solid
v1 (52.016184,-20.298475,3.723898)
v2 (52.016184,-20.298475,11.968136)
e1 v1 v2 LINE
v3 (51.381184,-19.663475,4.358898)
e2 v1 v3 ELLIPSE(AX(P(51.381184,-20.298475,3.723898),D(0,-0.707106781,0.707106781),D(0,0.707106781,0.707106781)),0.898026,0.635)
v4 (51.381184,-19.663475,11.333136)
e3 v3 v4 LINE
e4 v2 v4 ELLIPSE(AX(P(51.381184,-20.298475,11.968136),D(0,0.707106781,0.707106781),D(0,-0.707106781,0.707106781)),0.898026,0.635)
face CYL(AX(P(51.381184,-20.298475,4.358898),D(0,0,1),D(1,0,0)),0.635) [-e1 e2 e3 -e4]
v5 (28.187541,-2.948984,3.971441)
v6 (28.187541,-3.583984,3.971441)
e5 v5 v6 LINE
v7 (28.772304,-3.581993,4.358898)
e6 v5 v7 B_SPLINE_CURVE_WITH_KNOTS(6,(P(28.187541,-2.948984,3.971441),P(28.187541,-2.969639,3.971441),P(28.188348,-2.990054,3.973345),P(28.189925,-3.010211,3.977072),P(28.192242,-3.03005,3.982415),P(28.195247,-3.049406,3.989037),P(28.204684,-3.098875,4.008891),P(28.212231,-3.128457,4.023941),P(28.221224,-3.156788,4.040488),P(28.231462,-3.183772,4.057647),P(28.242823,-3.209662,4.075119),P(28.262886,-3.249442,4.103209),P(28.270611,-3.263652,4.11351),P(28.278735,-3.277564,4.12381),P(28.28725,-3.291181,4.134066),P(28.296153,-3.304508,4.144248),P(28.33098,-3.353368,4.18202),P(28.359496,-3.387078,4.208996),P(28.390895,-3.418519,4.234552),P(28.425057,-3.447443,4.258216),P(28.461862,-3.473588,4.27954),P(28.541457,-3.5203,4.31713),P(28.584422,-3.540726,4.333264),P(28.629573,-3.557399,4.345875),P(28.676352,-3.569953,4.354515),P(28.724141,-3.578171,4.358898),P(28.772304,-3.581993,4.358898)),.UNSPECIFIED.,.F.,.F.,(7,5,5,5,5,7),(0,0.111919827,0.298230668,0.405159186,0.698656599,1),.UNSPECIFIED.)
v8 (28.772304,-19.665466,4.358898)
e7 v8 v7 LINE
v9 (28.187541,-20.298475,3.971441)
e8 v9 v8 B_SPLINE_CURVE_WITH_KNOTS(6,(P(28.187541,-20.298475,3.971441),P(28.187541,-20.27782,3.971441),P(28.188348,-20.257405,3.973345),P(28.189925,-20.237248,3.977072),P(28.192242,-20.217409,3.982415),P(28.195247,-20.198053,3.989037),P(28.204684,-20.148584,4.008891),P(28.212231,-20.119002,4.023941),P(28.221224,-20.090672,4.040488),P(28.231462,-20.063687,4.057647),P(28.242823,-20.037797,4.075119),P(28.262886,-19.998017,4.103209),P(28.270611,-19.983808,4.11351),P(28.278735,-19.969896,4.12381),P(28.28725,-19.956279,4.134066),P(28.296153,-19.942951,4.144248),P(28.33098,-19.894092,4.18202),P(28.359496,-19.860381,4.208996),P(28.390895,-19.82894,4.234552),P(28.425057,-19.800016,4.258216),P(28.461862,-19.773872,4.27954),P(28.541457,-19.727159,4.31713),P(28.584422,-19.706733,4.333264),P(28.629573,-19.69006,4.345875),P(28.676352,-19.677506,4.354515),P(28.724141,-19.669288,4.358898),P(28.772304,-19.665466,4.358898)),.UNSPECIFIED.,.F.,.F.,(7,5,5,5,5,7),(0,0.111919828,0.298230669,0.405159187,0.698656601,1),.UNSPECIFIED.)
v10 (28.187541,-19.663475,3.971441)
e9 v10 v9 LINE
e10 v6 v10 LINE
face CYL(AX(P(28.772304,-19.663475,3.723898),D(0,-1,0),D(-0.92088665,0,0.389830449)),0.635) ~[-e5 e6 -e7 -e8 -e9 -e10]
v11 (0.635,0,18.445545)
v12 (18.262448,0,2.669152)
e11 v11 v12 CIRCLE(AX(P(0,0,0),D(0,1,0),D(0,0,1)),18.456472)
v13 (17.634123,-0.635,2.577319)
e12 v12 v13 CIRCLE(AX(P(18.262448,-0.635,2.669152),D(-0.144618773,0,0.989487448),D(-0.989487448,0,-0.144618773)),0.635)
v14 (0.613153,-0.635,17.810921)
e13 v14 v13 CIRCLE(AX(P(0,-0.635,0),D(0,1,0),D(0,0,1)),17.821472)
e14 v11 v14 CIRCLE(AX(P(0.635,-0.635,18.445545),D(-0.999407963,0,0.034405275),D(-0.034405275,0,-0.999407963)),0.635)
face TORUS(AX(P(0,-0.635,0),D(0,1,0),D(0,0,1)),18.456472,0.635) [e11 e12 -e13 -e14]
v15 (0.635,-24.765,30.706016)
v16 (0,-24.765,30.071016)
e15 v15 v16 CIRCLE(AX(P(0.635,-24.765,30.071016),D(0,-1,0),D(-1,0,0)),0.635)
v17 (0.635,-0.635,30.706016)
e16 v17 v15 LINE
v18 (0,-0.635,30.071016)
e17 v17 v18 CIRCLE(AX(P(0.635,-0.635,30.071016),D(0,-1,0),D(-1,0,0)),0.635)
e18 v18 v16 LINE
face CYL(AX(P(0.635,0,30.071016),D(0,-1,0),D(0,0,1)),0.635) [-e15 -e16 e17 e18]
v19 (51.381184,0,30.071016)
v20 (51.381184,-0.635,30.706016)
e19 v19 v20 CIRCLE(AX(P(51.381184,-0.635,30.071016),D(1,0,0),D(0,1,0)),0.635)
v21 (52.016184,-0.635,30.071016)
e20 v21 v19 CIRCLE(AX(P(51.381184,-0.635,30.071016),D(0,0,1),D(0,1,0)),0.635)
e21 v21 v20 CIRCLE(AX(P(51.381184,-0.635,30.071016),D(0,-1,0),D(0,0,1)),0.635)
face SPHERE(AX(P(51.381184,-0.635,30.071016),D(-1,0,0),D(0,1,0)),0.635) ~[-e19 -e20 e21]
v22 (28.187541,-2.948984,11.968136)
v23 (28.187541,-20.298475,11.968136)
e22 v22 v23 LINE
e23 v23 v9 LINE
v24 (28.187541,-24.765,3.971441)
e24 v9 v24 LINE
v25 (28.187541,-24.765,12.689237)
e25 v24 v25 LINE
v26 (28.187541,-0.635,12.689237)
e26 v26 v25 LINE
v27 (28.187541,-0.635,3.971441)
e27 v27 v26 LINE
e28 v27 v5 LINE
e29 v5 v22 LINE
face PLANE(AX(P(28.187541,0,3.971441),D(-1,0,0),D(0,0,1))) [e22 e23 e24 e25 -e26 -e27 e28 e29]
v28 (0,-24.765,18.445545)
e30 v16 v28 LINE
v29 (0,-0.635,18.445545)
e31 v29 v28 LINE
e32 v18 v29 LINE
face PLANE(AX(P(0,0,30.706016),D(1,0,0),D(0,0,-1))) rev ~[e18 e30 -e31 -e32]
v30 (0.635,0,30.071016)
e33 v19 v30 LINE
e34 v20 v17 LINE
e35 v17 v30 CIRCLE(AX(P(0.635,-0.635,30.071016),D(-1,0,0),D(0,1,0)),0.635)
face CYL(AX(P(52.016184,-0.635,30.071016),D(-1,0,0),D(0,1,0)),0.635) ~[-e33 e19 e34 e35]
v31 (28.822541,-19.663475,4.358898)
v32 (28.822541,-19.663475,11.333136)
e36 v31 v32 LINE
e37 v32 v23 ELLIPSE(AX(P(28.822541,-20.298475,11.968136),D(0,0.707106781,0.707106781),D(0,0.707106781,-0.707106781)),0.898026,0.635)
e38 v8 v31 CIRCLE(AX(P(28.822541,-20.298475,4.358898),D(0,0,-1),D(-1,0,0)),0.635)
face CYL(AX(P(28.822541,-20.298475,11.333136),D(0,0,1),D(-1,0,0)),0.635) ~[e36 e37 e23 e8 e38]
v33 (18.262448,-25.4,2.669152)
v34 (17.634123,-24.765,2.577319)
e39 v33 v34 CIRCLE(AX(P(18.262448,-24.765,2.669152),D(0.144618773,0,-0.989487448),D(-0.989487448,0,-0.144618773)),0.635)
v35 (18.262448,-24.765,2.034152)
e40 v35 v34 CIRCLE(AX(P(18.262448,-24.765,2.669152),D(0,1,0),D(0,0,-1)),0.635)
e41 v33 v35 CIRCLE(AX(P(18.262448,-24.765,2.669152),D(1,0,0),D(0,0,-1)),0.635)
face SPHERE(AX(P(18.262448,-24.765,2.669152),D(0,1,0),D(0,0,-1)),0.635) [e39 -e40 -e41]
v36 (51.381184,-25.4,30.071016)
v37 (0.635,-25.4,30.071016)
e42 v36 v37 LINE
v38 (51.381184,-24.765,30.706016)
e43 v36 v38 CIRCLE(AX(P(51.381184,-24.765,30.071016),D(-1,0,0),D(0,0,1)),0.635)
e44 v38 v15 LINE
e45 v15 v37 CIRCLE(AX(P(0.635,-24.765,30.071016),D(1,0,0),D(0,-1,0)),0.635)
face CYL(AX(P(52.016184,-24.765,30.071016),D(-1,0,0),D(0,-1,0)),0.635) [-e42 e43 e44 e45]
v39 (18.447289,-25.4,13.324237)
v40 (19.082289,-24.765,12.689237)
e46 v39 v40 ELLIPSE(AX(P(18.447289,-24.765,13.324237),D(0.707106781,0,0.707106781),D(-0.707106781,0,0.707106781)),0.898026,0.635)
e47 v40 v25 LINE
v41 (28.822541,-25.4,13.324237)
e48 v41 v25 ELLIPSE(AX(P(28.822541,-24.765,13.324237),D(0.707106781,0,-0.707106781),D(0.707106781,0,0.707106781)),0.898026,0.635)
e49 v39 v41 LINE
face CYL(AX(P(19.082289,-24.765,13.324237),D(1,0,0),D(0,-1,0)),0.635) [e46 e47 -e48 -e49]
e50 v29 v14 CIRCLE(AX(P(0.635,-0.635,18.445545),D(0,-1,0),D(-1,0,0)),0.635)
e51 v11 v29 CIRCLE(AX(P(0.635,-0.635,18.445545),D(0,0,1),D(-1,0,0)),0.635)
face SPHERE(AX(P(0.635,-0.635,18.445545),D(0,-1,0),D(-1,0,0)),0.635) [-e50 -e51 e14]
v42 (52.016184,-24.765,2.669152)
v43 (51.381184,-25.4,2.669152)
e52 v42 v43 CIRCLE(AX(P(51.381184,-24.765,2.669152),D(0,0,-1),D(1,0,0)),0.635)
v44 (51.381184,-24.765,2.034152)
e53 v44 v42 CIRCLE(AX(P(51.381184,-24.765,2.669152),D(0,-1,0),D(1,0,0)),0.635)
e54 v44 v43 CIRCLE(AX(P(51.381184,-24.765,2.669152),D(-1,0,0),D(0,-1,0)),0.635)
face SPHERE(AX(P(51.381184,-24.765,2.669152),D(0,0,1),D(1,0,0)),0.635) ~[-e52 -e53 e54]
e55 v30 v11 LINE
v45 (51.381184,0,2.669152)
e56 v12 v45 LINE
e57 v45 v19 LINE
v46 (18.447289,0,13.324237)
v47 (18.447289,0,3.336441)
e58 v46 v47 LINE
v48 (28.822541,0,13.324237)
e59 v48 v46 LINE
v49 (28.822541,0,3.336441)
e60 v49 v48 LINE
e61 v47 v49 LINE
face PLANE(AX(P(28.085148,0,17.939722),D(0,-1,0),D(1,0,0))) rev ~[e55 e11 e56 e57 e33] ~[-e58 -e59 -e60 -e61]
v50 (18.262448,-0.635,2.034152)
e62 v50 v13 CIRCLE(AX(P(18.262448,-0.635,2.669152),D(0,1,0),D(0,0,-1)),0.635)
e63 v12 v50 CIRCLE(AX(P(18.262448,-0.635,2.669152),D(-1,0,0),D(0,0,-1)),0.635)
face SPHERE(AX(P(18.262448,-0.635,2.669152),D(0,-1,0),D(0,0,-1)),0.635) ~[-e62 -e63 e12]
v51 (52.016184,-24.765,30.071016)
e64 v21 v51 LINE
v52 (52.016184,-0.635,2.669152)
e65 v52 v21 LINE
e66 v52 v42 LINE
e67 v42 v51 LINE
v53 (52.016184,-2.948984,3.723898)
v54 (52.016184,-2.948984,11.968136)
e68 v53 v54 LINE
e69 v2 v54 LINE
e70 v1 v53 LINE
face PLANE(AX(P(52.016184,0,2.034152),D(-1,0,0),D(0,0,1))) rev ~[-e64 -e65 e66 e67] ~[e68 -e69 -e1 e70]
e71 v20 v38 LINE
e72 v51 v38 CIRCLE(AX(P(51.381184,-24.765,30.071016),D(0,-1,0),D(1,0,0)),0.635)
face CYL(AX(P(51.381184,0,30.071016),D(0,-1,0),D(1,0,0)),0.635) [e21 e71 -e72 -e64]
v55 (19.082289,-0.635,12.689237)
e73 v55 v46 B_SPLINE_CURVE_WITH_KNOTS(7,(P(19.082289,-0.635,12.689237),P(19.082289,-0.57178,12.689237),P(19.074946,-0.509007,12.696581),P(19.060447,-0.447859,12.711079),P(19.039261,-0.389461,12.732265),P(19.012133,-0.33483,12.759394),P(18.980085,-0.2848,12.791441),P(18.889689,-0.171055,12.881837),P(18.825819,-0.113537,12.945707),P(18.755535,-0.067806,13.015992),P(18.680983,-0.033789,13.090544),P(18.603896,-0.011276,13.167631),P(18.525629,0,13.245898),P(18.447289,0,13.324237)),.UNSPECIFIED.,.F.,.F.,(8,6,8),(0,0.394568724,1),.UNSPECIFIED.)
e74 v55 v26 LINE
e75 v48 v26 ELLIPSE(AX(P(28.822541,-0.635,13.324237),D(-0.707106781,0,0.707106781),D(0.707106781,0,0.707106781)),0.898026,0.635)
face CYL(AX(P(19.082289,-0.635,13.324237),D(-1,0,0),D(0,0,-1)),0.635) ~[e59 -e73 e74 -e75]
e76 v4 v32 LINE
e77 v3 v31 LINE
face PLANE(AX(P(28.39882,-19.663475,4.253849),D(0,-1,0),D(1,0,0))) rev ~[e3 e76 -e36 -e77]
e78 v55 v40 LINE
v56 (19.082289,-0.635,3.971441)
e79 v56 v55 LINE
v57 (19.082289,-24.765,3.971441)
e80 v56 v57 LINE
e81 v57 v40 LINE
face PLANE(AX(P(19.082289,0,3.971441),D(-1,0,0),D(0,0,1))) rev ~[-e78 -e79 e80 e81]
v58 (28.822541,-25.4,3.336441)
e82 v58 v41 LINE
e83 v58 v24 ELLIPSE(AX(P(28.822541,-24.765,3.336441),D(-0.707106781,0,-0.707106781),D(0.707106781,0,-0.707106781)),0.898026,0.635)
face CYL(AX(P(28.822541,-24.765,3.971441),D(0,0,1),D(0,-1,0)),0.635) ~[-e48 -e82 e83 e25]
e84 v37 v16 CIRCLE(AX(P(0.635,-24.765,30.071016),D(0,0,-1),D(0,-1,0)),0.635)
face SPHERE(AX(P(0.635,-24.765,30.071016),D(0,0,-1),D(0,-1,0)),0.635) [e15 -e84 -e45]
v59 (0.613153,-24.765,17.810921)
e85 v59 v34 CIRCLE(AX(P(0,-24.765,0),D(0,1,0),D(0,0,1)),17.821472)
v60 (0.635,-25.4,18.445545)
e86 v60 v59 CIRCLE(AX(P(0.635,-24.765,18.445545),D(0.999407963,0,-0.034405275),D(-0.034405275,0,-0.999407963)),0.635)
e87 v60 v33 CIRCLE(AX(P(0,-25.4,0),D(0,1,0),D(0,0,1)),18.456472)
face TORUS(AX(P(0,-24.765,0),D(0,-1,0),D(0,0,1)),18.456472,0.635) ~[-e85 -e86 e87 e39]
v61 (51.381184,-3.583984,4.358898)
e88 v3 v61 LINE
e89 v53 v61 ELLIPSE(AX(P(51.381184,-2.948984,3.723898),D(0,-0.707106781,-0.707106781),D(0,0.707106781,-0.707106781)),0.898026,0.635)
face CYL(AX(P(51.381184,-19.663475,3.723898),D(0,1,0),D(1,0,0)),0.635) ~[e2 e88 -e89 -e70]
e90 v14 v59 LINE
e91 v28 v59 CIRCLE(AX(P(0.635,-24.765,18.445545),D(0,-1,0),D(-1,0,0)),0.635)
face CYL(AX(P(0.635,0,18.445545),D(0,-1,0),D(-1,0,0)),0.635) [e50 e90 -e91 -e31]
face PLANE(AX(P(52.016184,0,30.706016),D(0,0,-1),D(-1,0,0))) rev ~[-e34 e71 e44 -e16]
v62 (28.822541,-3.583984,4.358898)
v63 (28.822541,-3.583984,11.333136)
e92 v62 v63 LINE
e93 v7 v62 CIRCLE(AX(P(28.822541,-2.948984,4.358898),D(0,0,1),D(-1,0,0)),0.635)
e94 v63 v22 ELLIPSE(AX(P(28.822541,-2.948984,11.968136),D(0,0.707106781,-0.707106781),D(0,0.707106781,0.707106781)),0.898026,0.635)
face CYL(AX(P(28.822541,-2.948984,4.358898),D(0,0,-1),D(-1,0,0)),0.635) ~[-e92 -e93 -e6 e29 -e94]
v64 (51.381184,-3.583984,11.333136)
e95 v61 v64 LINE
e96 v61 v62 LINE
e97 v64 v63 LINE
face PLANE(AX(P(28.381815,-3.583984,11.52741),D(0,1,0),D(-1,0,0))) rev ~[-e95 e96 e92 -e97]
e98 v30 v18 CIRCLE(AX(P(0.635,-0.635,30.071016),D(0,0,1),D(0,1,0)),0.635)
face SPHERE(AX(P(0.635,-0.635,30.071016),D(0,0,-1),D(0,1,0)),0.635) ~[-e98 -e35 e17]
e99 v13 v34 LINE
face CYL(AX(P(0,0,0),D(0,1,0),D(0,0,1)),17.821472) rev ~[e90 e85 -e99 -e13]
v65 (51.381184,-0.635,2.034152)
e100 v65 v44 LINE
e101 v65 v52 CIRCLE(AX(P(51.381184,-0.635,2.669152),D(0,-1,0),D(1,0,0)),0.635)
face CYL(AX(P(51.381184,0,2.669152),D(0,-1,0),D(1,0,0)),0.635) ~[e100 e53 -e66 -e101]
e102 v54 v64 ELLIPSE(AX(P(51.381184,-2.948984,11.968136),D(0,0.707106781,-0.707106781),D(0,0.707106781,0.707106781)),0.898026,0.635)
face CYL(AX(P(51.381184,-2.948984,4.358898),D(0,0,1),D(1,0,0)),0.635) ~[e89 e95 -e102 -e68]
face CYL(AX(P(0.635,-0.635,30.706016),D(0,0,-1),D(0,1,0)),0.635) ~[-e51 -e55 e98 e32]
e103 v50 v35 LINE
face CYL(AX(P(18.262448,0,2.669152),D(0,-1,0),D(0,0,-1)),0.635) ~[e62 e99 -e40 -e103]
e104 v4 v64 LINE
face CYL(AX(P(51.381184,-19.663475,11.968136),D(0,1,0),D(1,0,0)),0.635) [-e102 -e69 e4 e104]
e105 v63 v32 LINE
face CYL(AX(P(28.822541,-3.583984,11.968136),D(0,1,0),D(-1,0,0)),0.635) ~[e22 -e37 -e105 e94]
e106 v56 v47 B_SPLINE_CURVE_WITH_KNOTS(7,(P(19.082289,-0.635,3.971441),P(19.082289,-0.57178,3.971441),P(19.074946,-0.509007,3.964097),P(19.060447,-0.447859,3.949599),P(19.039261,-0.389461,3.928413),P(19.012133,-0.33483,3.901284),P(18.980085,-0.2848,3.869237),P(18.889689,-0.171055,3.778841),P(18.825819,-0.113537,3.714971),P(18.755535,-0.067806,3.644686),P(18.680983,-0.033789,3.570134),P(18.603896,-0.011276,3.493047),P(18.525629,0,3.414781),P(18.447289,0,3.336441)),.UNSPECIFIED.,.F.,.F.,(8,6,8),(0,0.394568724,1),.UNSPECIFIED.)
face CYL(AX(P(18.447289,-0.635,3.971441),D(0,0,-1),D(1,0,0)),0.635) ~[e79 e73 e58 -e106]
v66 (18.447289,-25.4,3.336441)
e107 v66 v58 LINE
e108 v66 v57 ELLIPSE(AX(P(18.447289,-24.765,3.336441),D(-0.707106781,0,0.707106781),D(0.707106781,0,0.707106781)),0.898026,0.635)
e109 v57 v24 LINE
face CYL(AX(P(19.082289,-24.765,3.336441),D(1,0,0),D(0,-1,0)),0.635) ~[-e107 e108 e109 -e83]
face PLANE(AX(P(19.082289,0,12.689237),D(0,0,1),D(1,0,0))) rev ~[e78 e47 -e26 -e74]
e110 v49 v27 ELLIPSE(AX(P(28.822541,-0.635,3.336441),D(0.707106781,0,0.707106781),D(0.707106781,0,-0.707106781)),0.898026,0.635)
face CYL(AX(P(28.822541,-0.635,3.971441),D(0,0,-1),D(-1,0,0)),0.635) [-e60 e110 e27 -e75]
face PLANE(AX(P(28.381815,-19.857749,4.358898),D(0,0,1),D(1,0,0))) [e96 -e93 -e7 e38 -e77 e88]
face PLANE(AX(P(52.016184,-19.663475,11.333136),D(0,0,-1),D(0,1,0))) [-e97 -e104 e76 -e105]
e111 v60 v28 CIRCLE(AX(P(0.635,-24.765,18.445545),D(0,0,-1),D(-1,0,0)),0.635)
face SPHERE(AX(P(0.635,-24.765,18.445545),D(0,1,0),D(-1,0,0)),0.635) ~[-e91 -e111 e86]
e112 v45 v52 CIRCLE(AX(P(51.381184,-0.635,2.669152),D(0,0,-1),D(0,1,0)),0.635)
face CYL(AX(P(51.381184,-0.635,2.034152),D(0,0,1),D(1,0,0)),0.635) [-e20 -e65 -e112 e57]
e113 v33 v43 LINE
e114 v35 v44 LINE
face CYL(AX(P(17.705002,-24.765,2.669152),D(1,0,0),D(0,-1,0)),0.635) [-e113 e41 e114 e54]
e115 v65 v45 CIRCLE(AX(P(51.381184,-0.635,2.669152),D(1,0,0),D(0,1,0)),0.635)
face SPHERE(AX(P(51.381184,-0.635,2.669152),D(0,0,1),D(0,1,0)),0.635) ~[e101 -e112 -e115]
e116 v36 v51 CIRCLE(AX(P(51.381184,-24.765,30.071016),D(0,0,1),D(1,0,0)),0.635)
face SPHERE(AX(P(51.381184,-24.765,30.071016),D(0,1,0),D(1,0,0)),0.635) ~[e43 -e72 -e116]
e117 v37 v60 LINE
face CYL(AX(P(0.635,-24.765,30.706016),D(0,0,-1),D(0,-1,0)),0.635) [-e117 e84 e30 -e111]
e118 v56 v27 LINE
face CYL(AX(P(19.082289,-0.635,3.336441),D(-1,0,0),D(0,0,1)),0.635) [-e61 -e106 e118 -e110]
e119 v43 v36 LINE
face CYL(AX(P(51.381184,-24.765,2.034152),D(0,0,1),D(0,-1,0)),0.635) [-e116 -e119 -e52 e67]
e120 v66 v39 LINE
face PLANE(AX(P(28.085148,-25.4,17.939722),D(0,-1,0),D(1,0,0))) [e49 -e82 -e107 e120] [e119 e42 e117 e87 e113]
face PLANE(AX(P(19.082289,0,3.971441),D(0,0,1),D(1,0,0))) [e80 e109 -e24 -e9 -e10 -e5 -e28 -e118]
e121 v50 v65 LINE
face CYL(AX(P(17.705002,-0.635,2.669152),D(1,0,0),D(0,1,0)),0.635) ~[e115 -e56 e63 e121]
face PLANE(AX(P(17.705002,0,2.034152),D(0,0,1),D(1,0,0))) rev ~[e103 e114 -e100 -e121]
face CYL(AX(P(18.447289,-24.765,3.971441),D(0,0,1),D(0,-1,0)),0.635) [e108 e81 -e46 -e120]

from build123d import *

# Parameters (mm, degrees)
F0_W         = 9.105252102
F0_H         = 8.7177967653
F1_DEPTH     = 25.4
F2_W         = 16.0794917028
F2_H         = 6.9742375053
F3_DEPTH     = 23.8286424428
F4_R         = 0.635
F5_T1_DEPTH  = 16.0794917028
F5_T3_DEPTH  = 6.9742375053
F5_T5_DEPTH  = 8.7177967653
F5_T7_DEPTH  = 9.105252102
F5_T13_DEPTH = 17.6669917028
F5_T17_DEPTH = 8.5617375053
F5_T25_DEPTH = 17.6669917028
F5_T29_DEPTH = 8.5617375053
F5_T37_DEPTH = 8.5617375053
F5_T42_DEPTH = 17.5413992589
F5_T49_DEPTH = 17.5413992589
F5_T53_DEPTH = 8.5617375053
F5_T61_DEPTH = 10.3052967653
F5_T65_DEPTH = 10.692752102
F5_T72_DEPTH = 10.692752102
F5_T76_DEPTH = 10.3052967653
F5_T83_DEPTH = 10.692752102
F5_T87_DEPTH = 10.3052967653
F5_T94_DEPTH = 10.3052967653
F5_T98_DEPTH = 10.692752102
F6_R         = 0.635


# Not quite as in the source:
# - a fillet or chamfer that OpenCascade refuses, or shapes differently, is made with other operations: its cross-section is extruded or revolved along the edge and cut away or added


with BuildPart() as f1:
    # F0 (on Front) → F1 (new body)
    with BuildSketch(Plane.XZ):
        with BuildLine():
            ThreePointArc((0, 17.8214723471), (11.860718486, 13.3014372763), (17.7050021368, 2.0341523923))
            Line((17.7050021368, 2.0341523923), (52.0161837339, 2.0341523923))
            Line((52.0161837339, 2.0341523923), (52.0161837339, 30.7060163468))
            Line((52.0161837339, 30.7060163468), (0, 30.7060163468))
            Line((0, 30.7060163468), (0, 17.8214723471))
        make_face()
        with Locations((23.6349152401, 8.3303391002)):
            Rectangle(F0_W, F0_H, mode=Mode.SUBTRACT)
    extrude(amount=F1_DEPTH)

    # F2 (on face) → F3 (cut, through all)
    with BuildSketch(Plane.YZ.offset(52.0161837339)):
        with Locations((-11.6237296024, 7.8460171353)):
            Rectangle(F2_W, F2_H)
    extrude(amount=-F3_DEPTH, mode=Mode.SUBTRACT)

    # F4
    f4_edges = [f1.edges().sort_by_distance(p)[0] for p in [
        (23.634915, -25.4, 3.971441),
        (19.082289, -25.4, 8.330339),
        (23.634915, -25.4, 12.689237),
        (28.187541, -25.4, 8.330339),
        (52.016184, -11.62373, 4.358898),
        (52.016184, -19.663475, 7.846017),
        (52.016184, -11.62373, 11.333136),
        (52.016184, -3.583984, 7.846017),
    ]]
    fillet(f4_edges, radius=F4_R)

    # F5: fillet of radius 0.635 on 8 edges, made by hand

    # F5_s2 → F5_t1 (cut)
    with BuildSketch(Plane.XZ.offset(3.583983751)):
        with BuildLine():
            ThreePointArc((28.1875412911, 11.968135888), (28.3735284851, 11.5191230819), (28.8225412911, 11.333135888))
            Line((28.8225412911, 11.333135888), (28.1875412911, 11.333135888))
            Line((28.1875412911, 11.333135888), (28.1875412911, 11.968135888))
        make_face()
        with BuildLine():
            ThreePointArc((28.1875412911, 3.9714407176), (28.421565367, 4.2532443861), (28.7723043136, 4.3588983826))
            Line((28.7723043136, 4.3588983826), (28.1875412911, 4.3588983826))
            Line((28.1875412911, 4.3588983826), (28.1875412911, 3.9714407176))
        make_face()
    extrude(amount=F5_T1_DEPTH, mode=Mode.SUBTRACT)

    # F5_s4 → F5_t3 (cut)
    with BuildSketch(Plane.XY.offset(4.3588983826)):
        with BuildLine():
            ThreePointArc((28.1875412911, -20.2984754539), (28.3735284851, -19.8494626478), (28.8225412911, -19.6634754539))
            Line((28.8225412911, -19.6634754539), (28.1875412911, -19.6634754539))
            Line((28.1875412911, -19.6634754539), (28.1875412911, -20.2984754539))
        make_face()
        with BuildLine():
            ThreePointArc((28.1875412911, -2.948983751), (28.3735284851, -3.3979965571), (28.8225412911, -3.583983751))
            Line((28.8225412911, -3.583983751), (28.1875412911, -3.583983751))
            Line((28.1875412911, -3.583983751), (28.1875412911, -2.948983751))
        make_face()
    extrude(amount=F5_T3_DEPTH, mode=Mode.SUBTRACT)

    # F5_s6 → F5_t5 (cut)
    with BuildSketch(Plane.XY.offset(3.9714407176)):
        with BuildLine():
            ThreePointArc((28.1875412911, -0.635), (28.3735284851, -0.1859871939), (28.8225412911, 0))
            Line((28.8225412911, 0), (28.1875412911, 0))
            Line((28.1875412911, 0), (28.1875412911, -0.635))
        make_face()
        with BuildLine():
            ThreePointArc((19.0822891891, -0.635), (18.8963019952, -0.1859871939), (18.4472891891, 0))
            Line((18.4472891891, 0), (19.0822891891, 0))
            Line((19.0822891891, 0), (19.0822891891, -0.635))
        make_face()
    extrude(amount=F5_T5_DEPTH, mode=Mode.SUBTRACT)

    # F5_s8 → F5_t7 (cut)
    with BuildSketch(Plane.YZ.offset(19.0822891891)):
        with BuildLine():
            ThreePointArc((-0.635, 12.6892374828), (-0.1859871939, 12.8752246768), (0, 13.3242374828))
            Line((0, 13.3242374828), (0, 12.6892374828))
            Line((0, 12.6892374828), (-0.635, 12.6892374828))
        make_face()
        with BuildLine():
            ThreePointArc((-0.635, 3.9714407176), (-0.1859871939, 3.7854535236), (0, 3.3364407176))
            Line((0, 3.3364407176), (0, 3.9714407176))
            Line((0, 3.9714407176), (-0.635, 3.9714407176))
        make_face()
    extrude(amount=F5_T7_DEPTH, mode=Mode.SUBTRACT)


with BuildPart() as f5_tool11:
    # F5_s12 → F5_t13 (new body)
    with BuildSketch(Plane.XZ.offset(1.996483751)):
        with BuildLine():
            ThreePointArc((28.1875412911, 11.968135888), (28.3735284851, 11.5191230819), (28.8225412911, 11.333135888))
            Line((28.8225412911, 11.333135888), (28.1875412911, 11.333135888))
            Line((28.1875412911, 11.333135888), (28.1875412911, 11.968135888))
        make_face()
    extrude(amount=F5_T13_DEPTH)

    split(bisect_by=Plane.XZ.offset(3.583983751), keep=Keep.BOTTOM)


with BuildPart() as f5_tool15:
    # F5_s16 → F5_t17 (new body)
    with BuildSketch(Plane.XY.offset(4.3588983826)):
        with BuildLine():
            ThreePointArc((28.1875412911, -2.948983751), (28.3735284851, -3.3979965571), (28.8225412911, -3.583983751))
            Line((28.8225412911, -3.583983751), (28.1875412911, -3.583983751))
            Line((28.1875412911, -3.583983751), (28.1875412911, -2.948983751))
        make_face()
    extrude(amount=F5_T17_DEPTH)

    split(bisect_by=Plane.XY.offset(12.6892374828), keep=Keep.BOTTOM)

    split(bisect_by=Plane.XY.offset(11.333135888), keep=Keep.TOP)


with BuildPart() as f5_tool11_1:
    add(f5_tool11.part)

    # F5_t20: intersect F5_tool15
    add(f5_tool15.part, mode=Mode.INTERSECT)


with BuildPart() as f1_1:
    add(f1.part)

    # F5_t9: cut F5_tool11
    add(f5_tool11_1.part, mode=Mode.SUBTRACT)


with BuildPart() as f5_tool23:
    # F5_s24 → F5_t25 (new body)
    with BuildSketch(Plane.XZ.offset(3.583983751)):
        with BuildLine():
            ThreePointArc((28.1875412911, 11.968135888), (28.3735284851, 11.5191230819), (28.8225412911, 11.333135888))
            Line((28.8225412911, 11.333135888), (28.1875412911, 11.333135888))
            Line((28.1875412911, 11.333135888), (28.1875412911, 11.968135888))
        make_face()
    extrude(amount=F5_T25_DEPTH)

    split(bisect_by=Plane.XZ.offset(19.6634754539), keep=Keep.TOP)


with BuildPart() as f5_tool27:
    # F5_s28 → F5_t29 (new body)
    with BuildSketch(Plane.XY.offset(12.920635888)):
        with BuildLine():
            ThreePointArc((28.1875412911, -20.2984754539), (28.3735284851, -19.8494626478), (28.8225412911, -19.6634754539))
            Line((28.8225412911, -19.6634754539), (28.1875412911, -19.6634754539))
            Line((28.1875412911, -19.6634754539), (28.1875412911, -20.2984754539))
        make_face()
    extrude(amount=-F5_T29_DEPTH)

    split(bisect_by=Plane.XY.offset(12.6892374828), keep=Keep.BOTTOM)

    split(bisect_by=Plane.XY.offset(11.333135888), keep=Keep.TOP)


with BuildPart() as f5_tool23_1:
    add(f5_tool23.part)

    # F5_t32: intersect F5_tool27
    add(f5_tool27.part, mode=Mode.INTERSECT)


with BuildPart() as f1_2:
    add(f1_1.part)

    # F5_t21: cut F5_tool23
    add(f5_tool23_1.part, mode=Mode.SUBTRACT)


with BuildPart() as f5_tool35:
    # F5_s36 → F5_t37 (new body)
    with BuildSketch(Plane.XY.offset(11.333135888)):
        with BuildLine():
            ThreePointArc((28.1875412911, -20.2984754539), (28.3735284851, -19.8494626478), (28.8225412911, -19.6634754539))
            Line((28.8225412911, -19.6634754539), (28.1875412911, -19.6634754539))
            Line((28.1875412911, -19.6634754539), (28.1875412911, -20.2984754539))
        make_face()
    extrude(amount=-F5_T37_DEPTH)

    split(bisect_by=Plane.XY.offset(3.9714407176), keep=Keep.TOP)

    split(bisect_by=Plane.XY.offset(4.3588983826), keep=Keep.BOTTOM)


with BuildPart() as f5_tool40:
    # F5_s41 → F5_t42 (new body)
    with BuildSketch(Plane.XZ.offset(21.1253830099)):
        with BuildLine():
            ThreePointArc((28.1875412911, 3.9714407176), (28.421565367, 4.2532443861), (28.7723043136, 4.3588983826))
            Line((28.7723043136, 4.3588983826), (28.1875412911, 4.3588983826))
            Line((28.1875412911, 4.3588983826), (28.1875412911, 3.9714407176))
        make_face()
    extrude(amount=-F5_T42_DEPTH)

    split(bisect_by=Plane.XZ.offset(19.6634754539), keep=Keep.TOP)


with BuildPart() as f5_tool35_1:
    add(f5_tool35.part)

    # F5_t44: intersect F5_tool40
    add(f5_tool40.part, mode=Mode.INTERSECT)


with BuildPart() as f1_3:
    add(f1_2.part)

    # F5_t33: cut F5_tool35
    add(f5_tool35_1.part, mode=Mode.SUBTRACT)


with BuildPart() as f5_tool47:
    # F5_s48 → F5_t49 (new body)
    with BuildSketch(Plane.XZ.offset(19.6634754539)):
        with BuildLine():
            ThreePointArc((28.1875412911, 3.9714407176), (28.421565367, 4.2532443861), (28.7723043136, 4.3588983826))
            Line((28.7723043136, 4.3588983826), (28.1875412911, 4.3588983826))
            Line((28.1875412911, 4.3588983826), (28.1875412911, 3.9714407176))
        make_face()
    extrude(amount=-F5_T49_DEPTH)

    split(bisect_by=Plane.XZ.offset(3.583983751), keep=Keep.BOTTOM)


with BuildPart() as f5_tool51:
    # F5_s52 → F5_t53 (new body)
    with BuildSketch(Plane.XY.offset(2.7713983826)):
        with BuildLine():
            ThreePointArc((28.1875412911, -2.948983751), (28.3735284851, -3.3979965571), (28.8225412911, -3.583983751))
            Line((28.8225412911, -3.583983751), (28.1875412911, -3.583983751))
            Line((28.1875412911, -3.583983751), (28.1875412911, -2.948983751))
        make_face()
    extrude(amount=F5_T53_DEPTH)

    split(bisect_by=Plane.XY.offset(3.9714407176), keep=Keep.TOP)

    split(bisect_by=Plane.XY.offset(4.3588983826), keep=Keep.BOTTOM)


with BuildPart() as f5_tool47_1:
    add(f5_tool47.part)

    # F5_t56: intersect F5_tool51
    add(f5_tool51.part, mode=Mode.INTERSECT)


with BuildPart() as f1_4:
    add(f1_3.part)

    # F5_t45: cut F5_tool47
    add(f5_tool47_1.part, mode=Mode.SUBTRACT)


with BuildPart() as f5_tool59:
    # F5_s60 → F5_t61 (new body)
    with BuildSketch(Plane.XY.offset(14.2767374828)):
        with BuildLine():
            ThreePointArc((28.1875412911, -0.635), (28.3735284851, -0.1859871939), (28.8225412911, 0))
            Line((28.8225412911, 0), (28.1875412911, 0))
            Line((28.1875412911, 0), (28.1875412911, -0.635))
        make_face()
    extrude(amount=-F5_T61_DEPTH)

    split(bisect_by=Plane.XY.offset(12.6892374828), keep=Keep.TOP)


with BuildPart() as f5_tool63:
    # F5_s64 → F5_t65 (new body)
    with BuildSketch(Plane.YZ.offset(19.0822891891)):
        with BuildLine():
            ThreePointArc((-0.635, 12.6892374828), (-0.1859871939, 12.8752246768), (0, 13.3242374828))
            Line((0, 13.3242374828), (0, 12.6892374828))
            Line((0, 12.6892374828), (-0.635, 12.6892374828))
        make_face()
    extrude(amount=F5_T65_DEPTH)

    split(bisect_by=Plane.YZ.offset(28.1875412911), keep=Keep.TOP)


with BuildPart() as f5_tool59_1:
    add(f5_tool59.part)

    # F5_t67: intersect F5_tool63
    add(f5_tool63.part, mode=Mode.INTERSECT)


with BuildPart() as f1_5:
    add(f1_4.part)

    # F5_t57: cut F5_tool59
    add(f5_tool59_1.part, mode=Mode.SUBTRACT)


with BuildPart() as f5_tool70:
    # F5_s71 → F5_t72 (new body)
    with BuildSketch(Plane.YZ.offset(29.7750412911)):
        with BuildLine():
            ThreePointArc((-0.635, 3.9714407176), (-0.1859871939, 3.7854535236), (0, 3.3364407176))
            Line((0, 3.3364407176), (0, 3.9714407176))
            Line((0, 3.9714407176), (-0.635, 3.9714407176))
        make_face()
    extrude(amount=-F5_T72_DEPTH)

    split(bisect_by=Plane.YZ.offset(28.1875412911), keep=Keep.TOP)


with BuildPart() as f5_tool74:
    # F5_s75 → F5_t76 (new body)
    with BuildSketch(Plane.XY.offset(12.6892374828)):
        with BuildLine():
            ThreePointArc((28.1875412911, -0.635), (28.3735284851, -0.1859871939), (28.8225412911, 0))
            Line((28.8225412911, 0), (28.1875412911, 0))
            Line((28.1875412911, 0), (28.1875412911, -0.635))
        make_face()
    extrude(amount=-F5_T76_DEPTH)

    split(bisect_by=Plane.XY.offset(3.9714407176), keep=Keep.BOTTOM)


with BuildPart() as f5_tool70_1:
    add(f5_tool70.part)

    # F5_t78: intersect F5_tool74
    add(f5_tool74.part, mode=Mode.INTERSECT)


with BuildPart() as f1_6:
    add(f1_5.part)

    # F5_t68: cut F5_tool70
    add(f5_tool70_1.part, mode=Mode.SUBTRACT)


with BuildPart() as f5_tool81:
    # F5_s82 → F5_t83 (new body)
    with BuildSketch(Plane.YZ.offset(28.1875412911)):
        with BuildLine():
            ThreePointArc((-0.635, 3.9714407176), (-0.1859871939, 3.7854535236), (0, 3.3364407176))
            Line((0, 3.3364407176), (0, 3.9714407176))
            Line((0, 3.9714407176), (-0.635, 3.9714407176))
        make_face()
    extrude(amount=-F5_T83_DEPTH)

    split(bisect_by=Plane.YZ.offset(19.0822891891), keep=Keep.BOTTOM)


with BuildPart() as f5_tool85:
    # F5_s86 → F5_t87 (new body)
    with BuildSketch(Plane.XY.offset(2.3839407176)):
        with BuildLine():
            ThreePointArc((19.0822891891, -0.635), (18.8963019952, -0.1859871939), (18.4472891891, 0))
            Line((18.4472891891, 0), (19.0822891891, 0))
            Line((19.0822891891, 0), (19.0822891891, -0.635))
        make_face()
    extrude(amount=F5_T87_DEPTH)

    split(bisect_by=Plane.XY.offset(3.9714407176), keep=Keep.BOTTOM)


with BuildPart() as f5_tool81_1:
    add(f5_tool81.part)

    # F5_t89: intersect F5_tool85
    add(f5_tool85.part, mode=Mode.INTERSECT)


with BuildPart() as f1_7:
    add(f1_6.part)

    # F5_t79: cut F5_tool81
    add(f5_tool81_1.part, mode=Mode.SUBTRACT)


with BuildPart() as f5_tool92:
    # F5_s93 → F5_t94 (new body)
    with BuildSketch(Plane.XY.offset(3.9714407176)):
        with BuildLine():
            ThreePointArc((19.0822891891, -0.635), (18.8963019952, -0.1859871939), (18.4472891891, 0))
            Line((18.4472891891, 0), (19.0822891891, 0))
            Line((19.0822891891, 0), (19.0822891891, -0.635))
        make_face()
    extrude(amount=F5_T94_DEPTH)

    split(bisect_by=Plane.XY.offset(12.6892374828), keep=Keep.TOP)


with BuildPart() as f5_tool96:
    # F5_s97 → F5_t98 (new body)
    with BuildSketch(Plane.YZ.offset(17.4947891891)):
        with BuildLine():
            ThreePointArc((-0.635, 12.6892374828), (-0.1859871939, 12.8752246768), (0, 13.3242374828))
            Line((0, 13.3242374828), (0, 12.6892374828))
            Line((0, 12.6892374828), (-0.635, 12.6892374828))
        make_face()
    extrude(amount=F5_T98_DEPTH)

    split(bisect_by=Plane.YZ.offset(19.0822891891), keep=Keep.BOTTOM)


with BuildPart() as f5_tool92_1:
    add(f5_tool92.part)

    # F5_t100: intersect F5_tool96
    add(f5_tool96.part, mode=Mode.INTERSECT)


with BuildPart() as f1_8:
    add(f1_7.part)

    # F5_t90: cut F5_tool92
    add(f5_tool92_1.part, mode=Mode.SUBTRACT)

    # F6
    f6_edges = [f1_8.edges().sort_by_distance(p)[0] for p in [
        (11.860718, 0, 13.301437),
        (11.860718, -25.4, 13.301437),
        (17.705002, -12.7, 2.034152),
        (0, -12.7, 17.821472),
        (0, 0, 24.263744),
        (0, -25.4, 24.263744),
        (26.008092, 0, 30.706016),
        (52.016184, 0, 16.370084),
        (34.860593, 0, 2.034152),
        (52.016184, -12.7, 30.706016),
        (52.016184, -25.4, 16.370084),
        (52.016184, -12.7, 2.034152),
        (26.008092, -25.4, 30.706016),
        (0, -12.7, 30.706016),
        (34.860593, -25.4, 2.034152),
    ]]
    fillet(f6_edges, radius=F6_R)


solid = f1_8.part
